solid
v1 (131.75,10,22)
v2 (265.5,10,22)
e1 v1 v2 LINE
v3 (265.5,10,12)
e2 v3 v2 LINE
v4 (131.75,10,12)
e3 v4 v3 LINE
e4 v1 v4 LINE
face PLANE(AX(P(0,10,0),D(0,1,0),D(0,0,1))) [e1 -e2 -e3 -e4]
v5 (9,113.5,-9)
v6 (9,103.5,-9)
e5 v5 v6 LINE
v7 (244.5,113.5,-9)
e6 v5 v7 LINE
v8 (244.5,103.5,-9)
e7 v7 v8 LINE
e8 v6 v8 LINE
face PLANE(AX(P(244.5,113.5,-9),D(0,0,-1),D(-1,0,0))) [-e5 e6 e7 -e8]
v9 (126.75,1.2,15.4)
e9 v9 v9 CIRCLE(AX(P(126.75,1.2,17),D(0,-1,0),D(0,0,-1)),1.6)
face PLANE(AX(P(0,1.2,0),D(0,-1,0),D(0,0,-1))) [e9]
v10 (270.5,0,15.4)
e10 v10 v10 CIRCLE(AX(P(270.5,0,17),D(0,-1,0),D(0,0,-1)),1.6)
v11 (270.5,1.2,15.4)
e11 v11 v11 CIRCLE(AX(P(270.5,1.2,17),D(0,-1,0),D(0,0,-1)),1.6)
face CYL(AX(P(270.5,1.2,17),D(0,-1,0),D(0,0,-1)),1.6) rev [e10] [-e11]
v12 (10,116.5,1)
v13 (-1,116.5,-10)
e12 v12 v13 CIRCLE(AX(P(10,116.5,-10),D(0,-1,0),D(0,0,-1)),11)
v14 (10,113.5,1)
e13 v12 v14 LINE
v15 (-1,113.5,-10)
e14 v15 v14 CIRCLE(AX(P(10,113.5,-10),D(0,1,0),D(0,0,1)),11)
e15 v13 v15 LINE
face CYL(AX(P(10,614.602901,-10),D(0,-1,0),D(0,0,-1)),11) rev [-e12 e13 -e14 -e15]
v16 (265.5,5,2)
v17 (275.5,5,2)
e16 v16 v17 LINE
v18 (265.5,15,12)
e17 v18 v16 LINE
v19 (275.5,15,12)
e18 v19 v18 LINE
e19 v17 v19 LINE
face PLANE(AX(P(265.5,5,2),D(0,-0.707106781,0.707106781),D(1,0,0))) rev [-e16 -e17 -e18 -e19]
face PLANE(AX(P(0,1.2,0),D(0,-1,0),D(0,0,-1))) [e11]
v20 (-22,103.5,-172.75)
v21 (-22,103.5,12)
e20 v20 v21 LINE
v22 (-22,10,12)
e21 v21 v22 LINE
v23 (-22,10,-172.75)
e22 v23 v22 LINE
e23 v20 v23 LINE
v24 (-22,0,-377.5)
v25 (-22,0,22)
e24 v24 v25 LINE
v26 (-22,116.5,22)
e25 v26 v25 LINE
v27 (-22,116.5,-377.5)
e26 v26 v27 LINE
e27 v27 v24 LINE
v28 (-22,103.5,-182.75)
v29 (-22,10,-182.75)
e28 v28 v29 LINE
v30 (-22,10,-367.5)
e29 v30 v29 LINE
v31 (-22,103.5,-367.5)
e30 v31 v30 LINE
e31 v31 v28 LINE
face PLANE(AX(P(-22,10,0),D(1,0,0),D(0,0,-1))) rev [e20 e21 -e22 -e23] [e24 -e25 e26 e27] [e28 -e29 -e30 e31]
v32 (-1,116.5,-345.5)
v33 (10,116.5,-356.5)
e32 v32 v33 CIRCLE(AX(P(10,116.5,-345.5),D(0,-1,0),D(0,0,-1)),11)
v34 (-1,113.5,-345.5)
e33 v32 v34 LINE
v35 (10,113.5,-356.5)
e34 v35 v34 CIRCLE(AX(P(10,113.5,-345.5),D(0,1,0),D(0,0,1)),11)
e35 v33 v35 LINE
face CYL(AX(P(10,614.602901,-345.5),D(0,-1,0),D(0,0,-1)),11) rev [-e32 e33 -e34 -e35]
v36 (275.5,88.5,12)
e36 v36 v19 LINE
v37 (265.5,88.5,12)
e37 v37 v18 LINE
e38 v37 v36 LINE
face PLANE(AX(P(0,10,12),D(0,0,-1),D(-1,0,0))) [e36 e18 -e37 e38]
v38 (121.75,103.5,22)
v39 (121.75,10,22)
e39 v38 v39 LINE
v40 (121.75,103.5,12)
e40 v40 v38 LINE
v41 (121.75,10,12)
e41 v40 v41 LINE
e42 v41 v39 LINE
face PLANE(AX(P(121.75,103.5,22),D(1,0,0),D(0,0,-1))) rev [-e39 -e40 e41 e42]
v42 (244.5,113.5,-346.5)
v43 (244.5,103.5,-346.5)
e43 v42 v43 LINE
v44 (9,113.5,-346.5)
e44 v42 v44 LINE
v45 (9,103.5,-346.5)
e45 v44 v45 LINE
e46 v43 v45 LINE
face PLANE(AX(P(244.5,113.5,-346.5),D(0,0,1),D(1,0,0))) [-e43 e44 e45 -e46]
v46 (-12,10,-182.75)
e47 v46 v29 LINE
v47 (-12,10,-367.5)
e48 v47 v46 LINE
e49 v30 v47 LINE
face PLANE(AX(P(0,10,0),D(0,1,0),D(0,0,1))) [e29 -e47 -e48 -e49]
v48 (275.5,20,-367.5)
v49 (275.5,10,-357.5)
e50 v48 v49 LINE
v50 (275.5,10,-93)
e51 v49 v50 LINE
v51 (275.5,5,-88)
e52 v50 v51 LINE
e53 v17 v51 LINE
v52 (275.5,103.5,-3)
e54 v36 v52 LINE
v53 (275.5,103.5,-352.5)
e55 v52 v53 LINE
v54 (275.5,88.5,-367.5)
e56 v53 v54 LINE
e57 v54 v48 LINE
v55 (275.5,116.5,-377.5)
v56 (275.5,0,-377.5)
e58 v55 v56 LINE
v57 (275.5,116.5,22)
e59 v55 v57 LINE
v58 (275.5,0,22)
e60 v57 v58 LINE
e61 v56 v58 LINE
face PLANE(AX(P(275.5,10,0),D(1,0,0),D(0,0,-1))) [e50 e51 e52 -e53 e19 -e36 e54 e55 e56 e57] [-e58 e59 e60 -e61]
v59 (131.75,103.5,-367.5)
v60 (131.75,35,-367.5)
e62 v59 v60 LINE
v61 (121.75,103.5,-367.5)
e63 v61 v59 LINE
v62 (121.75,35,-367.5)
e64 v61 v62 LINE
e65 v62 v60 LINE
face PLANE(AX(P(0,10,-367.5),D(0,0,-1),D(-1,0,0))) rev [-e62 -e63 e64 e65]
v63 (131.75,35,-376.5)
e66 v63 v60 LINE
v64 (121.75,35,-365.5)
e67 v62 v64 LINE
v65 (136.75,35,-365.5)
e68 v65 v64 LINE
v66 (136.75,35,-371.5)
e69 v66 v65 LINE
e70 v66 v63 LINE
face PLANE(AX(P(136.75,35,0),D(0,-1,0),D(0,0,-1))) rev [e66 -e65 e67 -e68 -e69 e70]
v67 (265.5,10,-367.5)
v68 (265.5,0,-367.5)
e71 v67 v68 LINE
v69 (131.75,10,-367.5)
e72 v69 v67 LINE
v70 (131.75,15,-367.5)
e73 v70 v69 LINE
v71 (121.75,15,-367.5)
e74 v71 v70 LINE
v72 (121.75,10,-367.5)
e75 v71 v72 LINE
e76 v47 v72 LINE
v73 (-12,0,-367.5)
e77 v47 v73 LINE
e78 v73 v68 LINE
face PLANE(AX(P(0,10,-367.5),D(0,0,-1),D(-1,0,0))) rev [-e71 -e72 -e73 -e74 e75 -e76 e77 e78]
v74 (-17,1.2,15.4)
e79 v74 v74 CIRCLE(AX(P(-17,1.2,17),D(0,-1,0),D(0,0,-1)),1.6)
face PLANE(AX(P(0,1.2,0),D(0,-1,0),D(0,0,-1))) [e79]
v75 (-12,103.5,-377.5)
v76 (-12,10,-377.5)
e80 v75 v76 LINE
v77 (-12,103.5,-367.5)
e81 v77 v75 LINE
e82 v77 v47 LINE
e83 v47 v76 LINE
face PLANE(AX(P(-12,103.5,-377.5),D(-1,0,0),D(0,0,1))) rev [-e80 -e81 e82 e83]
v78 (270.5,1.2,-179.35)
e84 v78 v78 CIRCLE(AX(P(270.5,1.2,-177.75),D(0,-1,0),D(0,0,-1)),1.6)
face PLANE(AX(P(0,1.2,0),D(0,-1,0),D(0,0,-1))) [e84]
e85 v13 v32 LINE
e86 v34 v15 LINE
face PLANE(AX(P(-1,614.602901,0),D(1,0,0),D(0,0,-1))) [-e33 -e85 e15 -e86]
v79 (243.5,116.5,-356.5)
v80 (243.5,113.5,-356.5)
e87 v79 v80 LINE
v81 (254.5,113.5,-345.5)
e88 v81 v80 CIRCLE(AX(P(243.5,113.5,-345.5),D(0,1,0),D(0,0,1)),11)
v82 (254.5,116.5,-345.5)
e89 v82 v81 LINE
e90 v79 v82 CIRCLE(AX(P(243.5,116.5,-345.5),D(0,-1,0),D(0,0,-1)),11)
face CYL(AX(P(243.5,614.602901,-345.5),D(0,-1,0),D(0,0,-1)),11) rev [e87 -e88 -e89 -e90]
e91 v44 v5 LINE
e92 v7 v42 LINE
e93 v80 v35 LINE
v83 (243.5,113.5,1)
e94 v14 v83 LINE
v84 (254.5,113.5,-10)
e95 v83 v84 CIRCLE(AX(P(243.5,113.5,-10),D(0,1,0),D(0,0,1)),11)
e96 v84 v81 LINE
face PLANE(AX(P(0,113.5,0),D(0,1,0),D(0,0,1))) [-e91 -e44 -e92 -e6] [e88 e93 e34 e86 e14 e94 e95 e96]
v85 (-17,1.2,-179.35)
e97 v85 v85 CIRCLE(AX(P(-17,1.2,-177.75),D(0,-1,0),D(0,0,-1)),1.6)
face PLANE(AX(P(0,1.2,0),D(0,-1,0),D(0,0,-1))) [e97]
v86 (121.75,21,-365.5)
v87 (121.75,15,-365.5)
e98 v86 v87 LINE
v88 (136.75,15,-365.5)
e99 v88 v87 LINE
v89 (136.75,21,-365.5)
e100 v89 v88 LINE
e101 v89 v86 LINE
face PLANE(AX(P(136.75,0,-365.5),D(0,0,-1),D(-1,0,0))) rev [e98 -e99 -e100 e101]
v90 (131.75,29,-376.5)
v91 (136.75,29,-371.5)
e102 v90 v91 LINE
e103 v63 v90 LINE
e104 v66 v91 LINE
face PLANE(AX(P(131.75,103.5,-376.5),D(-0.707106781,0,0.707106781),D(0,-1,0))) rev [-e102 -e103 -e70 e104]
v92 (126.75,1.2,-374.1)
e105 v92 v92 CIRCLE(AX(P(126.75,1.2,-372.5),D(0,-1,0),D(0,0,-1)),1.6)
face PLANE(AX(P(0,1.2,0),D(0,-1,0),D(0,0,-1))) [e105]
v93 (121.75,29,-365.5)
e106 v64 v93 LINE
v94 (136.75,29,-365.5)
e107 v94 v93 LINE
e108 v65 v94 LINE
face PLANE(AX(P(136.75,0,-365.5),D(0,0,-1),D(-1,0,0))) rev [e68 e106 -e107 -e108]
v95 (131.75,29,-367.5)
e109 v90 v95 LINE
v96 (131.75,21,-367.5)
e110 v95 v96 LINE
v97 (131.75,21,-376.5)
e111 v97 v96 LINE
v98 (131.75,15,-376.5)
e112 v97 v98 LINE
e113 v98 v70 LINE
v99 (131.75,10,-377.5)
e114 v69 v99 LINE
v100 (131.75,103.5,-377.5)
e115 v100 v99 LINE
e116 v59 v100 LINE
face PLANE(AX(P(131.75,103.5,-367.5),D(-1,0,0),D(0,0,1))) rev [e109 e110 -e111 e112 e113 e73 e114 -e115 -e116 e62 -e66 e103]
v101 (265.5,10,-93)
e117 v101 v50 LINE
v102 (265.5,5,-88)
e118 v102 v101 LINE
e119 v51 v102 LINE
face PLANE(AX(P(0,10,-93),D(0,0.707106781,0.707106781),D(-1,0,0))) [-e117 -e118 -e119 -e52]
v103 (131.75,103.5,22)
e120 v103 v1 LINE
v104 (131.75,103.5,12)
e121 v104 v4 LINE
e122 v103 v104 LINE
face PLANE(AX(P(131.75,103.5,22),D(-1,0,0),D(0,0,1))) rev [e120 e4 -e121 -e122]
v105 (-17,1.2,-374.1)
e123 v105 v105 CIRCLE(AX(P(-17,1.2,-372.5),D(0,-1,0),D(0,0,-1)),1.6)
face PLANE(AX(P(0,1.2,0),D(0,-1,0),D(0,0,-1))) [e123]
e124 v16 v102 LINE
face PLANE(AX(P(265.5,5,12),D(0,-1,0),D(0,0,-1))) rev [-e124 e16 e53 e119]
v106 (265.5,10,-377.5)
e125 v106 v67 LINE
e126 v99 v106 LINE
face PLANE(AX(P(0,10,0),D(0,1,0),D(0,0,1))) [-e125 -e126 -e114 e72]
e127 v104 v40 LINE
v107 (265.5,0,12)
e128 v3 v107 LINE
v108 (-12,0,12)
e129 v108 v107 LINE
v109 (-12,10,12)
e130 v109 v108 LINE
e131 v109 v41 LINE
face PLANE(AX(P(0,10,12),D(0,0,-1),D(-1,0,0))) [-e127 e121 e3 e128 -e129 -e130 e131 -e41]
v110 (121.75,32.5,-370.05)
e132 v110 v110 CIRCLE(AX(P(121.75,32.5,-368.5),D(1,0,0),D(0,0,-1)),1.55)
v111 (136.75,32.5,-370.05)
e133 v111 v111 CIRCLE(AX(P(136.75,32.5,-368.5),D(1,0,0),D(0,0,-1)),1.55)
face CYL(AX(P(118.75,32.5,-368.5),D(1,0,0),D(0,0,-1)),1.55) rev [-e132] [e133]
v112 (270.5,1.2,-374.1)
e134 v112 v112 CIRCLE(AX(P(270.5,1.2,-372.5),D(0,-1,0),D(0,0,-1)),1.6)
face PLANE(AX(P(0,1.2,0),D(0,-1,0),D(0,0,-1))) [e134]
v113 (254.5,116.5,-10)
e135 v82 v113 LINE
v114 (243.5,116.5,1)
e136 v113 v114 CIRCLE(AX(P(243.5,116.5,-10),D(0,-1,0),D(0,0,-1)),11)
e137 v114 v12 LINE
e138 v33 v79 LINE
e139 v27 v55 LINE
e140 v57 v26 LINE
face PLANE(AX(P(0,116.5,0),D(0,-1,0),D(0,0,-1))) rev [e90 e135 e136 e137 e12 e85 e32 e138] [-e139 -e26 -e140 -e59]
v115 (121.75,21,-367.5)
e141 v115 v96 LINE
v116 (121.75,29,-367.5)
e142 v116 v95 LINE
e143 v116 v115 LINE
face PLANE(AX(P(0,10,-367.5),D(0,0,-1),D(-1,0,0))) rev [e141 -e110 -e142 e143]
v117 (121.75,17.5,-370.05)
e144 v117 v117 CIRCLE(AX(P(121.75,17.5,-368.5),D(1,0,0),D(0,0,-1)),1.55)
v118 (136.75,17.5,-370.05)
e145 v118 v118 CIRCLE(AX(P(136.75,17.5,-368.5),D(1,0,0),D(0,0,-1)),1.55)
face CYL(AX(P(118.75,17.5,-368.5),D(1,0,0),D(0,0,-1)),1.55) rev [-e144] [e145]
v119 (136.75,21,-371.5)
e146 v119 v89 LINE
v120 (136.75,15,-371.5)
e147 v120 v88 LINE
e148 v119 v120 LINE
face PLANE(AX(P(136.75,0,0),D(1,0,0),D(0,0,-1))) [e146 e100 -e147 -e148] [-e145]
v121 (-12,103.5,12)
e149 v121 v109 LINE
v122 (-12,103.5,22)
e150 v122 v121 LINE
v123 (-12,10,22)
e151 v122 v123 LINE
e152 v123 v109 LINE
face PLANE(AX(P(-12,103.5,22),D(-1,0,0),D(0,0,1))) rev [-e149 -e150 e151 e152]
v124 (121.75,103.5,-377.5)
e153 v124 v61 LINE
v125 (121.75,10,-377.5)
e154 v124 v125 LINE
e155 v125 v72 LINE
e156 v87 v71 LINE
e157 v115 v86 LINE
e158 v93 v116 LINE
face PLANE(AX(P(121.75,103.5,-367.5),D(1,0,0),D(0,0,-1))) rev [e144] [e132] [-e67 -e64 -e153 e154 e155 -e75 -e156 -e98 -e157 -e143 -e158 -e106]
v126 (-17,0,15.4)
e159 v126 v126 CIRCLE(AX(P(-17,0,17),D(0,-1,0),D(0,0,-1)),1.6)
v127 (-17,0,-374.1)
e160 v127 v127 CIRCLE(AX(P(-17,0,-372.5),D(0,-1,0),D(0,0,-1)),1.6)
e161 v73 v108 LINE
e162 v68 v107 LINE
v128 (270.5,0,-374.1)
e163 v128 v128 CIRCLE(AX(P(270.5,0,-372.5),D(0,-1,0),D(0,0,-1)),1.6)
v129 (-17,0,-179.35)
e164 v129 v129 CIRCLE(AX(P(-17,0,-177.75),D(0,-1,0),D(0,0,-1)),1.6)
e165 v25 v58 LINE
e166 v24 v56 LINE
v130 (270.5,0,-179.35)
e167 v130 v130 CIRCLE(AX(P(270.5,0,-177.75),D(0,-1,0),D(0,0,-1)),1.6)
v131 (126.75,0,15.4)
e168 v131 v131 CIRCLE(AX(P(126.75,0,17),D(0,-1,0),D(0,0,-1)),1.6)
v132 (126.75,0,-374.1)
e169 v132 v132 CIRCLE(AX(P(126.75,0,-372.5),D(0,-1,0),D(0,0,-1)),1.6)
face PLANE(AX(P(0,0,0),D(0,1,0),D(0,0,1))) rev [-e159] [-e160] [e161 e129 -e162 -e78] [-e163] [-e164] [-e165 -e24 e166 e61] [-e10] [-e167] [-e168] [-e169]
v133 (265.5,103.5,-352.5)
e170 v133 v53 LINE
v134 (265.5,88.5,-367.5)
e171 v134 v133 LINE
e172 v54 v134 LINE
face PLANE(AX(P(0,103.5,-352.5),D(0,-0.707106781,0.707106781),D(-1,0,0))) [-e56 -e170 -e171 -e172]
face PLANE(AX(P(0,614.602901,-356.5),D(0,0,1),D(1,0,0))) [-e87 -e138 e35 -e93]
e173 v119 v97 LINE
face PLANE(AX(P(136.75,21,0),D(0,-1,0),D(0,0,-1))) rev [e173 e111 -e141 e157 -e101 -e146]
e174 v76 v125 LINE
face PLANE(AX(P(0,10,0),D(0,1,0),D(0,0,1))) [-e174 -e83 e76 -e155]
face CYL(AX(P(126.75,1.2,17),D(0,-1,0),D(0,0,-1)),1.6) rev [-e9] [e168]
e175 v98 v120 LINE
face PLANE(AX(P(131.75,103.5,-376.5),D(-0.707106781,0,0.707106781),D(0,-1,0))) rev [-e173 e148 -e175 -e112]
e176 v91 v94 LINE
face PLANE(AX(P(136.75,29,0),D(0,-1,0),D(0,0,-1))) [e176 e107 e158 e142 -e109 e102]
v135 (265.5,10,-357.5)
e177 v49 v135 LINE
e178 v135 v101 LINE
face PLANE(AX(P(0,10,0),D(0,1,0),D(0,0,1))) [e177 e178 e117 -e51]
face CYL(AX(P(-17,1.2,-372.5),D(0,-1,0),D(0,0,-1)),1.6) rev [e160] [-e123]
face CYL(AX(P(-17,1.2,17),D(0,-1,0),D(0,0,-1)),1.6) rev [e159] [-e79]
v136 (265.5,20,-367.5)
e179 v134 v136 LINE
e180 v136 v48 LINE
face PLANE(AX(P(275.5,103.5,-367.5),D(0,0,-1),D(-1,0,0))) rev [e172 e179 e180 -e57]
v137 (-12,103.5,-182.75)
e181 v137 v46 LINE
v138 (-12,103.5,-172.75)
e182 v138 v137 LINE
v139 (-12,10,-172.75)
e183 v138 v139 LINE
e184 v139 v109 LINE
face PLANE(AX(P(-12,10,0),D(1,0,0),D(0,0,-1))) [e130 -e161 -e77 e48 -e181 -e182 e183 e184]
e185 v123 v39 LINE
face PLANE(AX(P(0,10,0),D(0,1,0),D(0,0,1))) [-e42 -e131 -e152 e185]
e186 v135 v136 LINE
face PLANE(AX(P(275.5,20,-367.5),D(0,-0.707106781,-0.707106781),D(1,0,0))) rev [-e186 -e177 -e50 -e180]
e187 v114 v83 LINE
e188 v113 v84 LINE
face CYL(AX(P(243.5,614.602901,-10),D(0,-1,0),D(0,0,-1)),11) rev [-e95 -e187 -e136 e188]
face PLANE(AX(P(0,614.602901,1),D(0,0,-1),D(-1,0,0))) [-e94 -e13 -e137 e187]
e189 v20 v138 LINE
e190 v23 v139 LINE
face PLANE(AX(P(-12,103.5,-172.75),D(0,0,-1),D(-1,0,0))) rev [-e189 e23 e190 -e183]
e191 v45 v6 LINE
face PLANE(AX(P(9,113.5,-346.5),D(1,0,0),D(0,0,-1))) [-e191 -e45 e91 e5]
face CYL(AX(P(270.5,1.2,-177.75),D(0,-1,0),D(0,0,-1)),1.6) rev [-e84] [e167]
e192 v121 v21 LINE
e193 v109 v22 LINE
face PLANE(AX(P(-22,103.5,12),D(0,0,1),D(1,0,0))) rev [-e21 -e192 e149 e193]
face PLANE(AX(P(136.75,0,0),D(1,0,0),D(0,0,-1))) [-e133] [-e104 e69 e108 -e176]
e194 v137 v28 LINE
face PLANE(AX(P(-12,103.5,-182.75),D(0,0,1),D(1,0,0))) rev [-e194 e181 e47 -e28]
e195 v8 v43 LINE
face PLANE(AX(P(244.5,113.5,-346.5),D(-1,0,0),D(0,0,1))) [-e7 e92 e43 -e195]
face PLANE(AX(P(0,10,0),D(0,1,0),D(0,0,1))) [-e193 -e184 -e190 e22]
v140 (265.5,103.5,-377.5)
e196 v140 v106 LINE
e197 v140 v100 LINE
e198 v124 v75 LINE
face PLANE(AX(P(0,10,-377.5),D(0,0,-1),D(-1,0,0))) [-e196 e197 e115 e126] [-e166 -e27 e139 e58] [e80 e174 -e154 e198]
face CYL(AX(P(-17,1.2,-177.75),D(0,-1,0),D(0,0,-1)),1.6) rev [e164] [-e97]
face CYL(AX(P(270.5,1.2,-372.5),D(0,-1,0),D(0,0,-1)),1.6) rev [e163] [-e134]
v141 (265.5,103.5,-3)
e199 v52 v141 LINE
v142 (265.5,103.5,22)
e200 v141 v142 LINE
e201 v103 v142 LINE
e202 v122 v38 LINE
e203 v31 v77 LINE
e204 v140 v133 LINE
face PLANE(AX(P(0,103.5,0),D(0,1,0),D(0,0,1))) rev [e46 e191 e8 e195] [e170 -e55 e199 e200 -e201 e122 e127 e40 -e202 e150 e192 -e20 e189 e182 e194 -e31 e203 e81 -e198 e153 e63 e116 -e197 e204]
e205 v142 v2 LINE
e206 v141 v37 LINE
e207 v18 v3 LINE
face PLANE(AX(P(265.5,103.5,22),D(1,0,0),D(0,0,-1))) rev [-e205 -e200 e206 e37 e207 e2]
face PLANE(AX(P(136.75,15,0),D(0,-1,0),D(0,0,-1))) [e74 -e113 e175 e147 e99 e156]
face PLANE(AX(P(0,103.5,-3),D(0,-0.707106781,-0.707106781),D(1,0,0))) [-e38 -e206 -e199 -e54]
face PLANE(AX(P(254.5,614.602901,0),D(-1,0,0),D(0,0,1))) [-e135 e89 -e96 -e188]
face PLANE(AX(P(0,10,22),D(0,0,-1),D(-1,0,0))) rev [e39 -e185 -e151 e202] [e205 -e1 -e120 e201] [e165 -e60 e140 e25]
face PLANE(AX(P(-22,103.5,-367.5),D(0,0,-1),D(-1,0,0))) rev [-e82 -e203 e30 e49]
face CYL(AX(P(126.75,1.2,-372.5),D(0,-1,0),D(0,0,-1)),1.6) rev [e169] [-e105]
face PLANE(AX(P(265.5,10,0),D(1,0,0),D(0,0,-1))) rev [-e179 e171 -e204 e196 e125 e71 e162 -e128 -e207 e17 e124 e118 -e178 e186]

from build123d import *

# Parameters (mm, degrees)
SKETCH1_W           = 297.5
SKETCH1_H           = 399.5
SKETCH1_W_2         = 277.5
SKETCH1_H_2         = 379.5
BOSS_EXTRUDE1_DEPTH = 10
SKETCH2_W           = 10
SKETCH2_H           = 10
BOSS_EXTRUDE2_DEPTH = 93.5
SKETCH3_W           = 297.5
SKETCH3_H           = 399.5
SKETCH3_W_2         = 235.5
SKETCH3_H_2         = 337.5
BOSS_EXTRUDE3_DEPTH = 10
CUT_EXTRUDE1_DEPTH  = 1.2
SKETCH6_W           = 297.5
SKETCH6_H           = 399.5
BOSS_EXTRUDE4_DEPTH = 3
SKETCH7_W           = 14
SKETCH7_H           = 93.5
CUT_EXTRUDE2_DEPTH  = 16.15
CHAMFER1_SIZE       = 15
SKETCH8_W           = 4
SKETCH8_H           = 6
SKETCH8_W_2         = 2
BOSS_EXTRUDE5_DEPTH = 5
SKETCH10_W          = 2
SKETCH10_H          = 6
BOSS_EXTRUDE6_DEPTH = 10
CUT_EXTRUDE4_DEPTH  = 18
CHAMFER2_SIZE       = 5
SKETCH12_W          = 95
SKETCH12_H          = 5
CUT_EXTRUDE5_DEPTH  = 10
CHAMFER3_SIZE       = 10


# Some blends are built 0.0001 mm under size
with BuildPart() as part:
    # Sketch1 → Boss-Extrude1 (new body)
    with BuildSketch(Plane(origin=(0, 0, 0), x_dir=(1, 0, 0), z_dir=(0, 1, 0))):
        with Locations((126.75, 177.75)):
            Rectangle(SKETCH1_W, SKETCH1_H)
        with Locations((126.75, 177.75)):
            Rectangle(SKETCH1_W_2, SKETCH1_H_2, mode=Mode.SUBTRACT)
    extrude(amount=BOSS_EXTRUDE1_DEPTH)

    # Sketch2 → Boss-Extrude2 (add)
    with BuildSketch(Plane(origin=(0, 10, 0), x_dir=(1, 0, 0), z_dir=(0, 1, 0))):
        with Locations((126.75, -17)):
            Rectangle(SKETCH2_W, SKETCH2_H)
        with Locations((270.5, -17)):
            Rectangle(SKETCH2_W, SKETCH2_H)
        with Locations((-17, -17)):
            Rectangle(SKETCH2_W, SKETCH2_H)
        with Locations((-17, 372.5)):
            Rectangle(SKETCH2_W, SKETCH2_H)
        with Locations((270.5, 372.5)):
            Rectangle(SKETCH2_W, SKETCH2_H)
        with Locations((126.75, 372.5)):
            Rectangle(SKETCH2_W, SKETCH2_H)
        with Locations((270.5, 177.75)):
            Rectangle(SKETCH2_W, SKETCH2_H)
        with Locations((-17, 177.75)):
            Rectangle(SKETCH2_W, SKETCH2_H)
    extrude(amount=BOSS_EXTRUDE2_DEPTH)

    # Sketch3 → Boss-Extrude3 (add)
    with BuildSketch(Plane(origin=(0, 103.5, 0), x_dir=(1, 0, 0), z_dir=(0, 1, 0))):
        with Locations((126.75, 177.75)):
            Rectangle(SKETCH3_W, SKETCH3_H)
        with Locations((126.75, 177.75)):
            Rectangle(SKETCH3_W_2, SKETCH3_H_2, mode=Mode.SUBTRACT)
    extrude(amount=BOSS_EXTRUDE3_DEPTH)

    # Sketch4 → Cut-Extrude1 (cut)
    with BuildSketch(Plane.XZ):
        with BuildLine():
            ThreePointArc((268.9, 17), (269.021792748, 16.387706508), (269.36862915, 15.86862915))
            Line((269.36862915, 15.86862915), (270.5, 17))
            Line((270.5, 17), (268.9, 17))
        make_face()
        with BuildLine():
            Line((270.5, 17), (269.36862915, 15.86862915))
            ThreePointArc((269.36862915, 15.86862915), (271.112293492, 15.521792748), (272.1, 17))
            Line((272.1, 17), (270.5, 17))
        make_face()
        with BuildLine():
            Line((270.5, 17), (272.1, 17))
            ThreePointArc((272.1, 17), (271.978207252, 17.612293492), (271.63137085, 18.13137085))
            Line((271.63137085, 18.13137085), (270.5, 17))
        make_face()
        with BuildLine():
            ThreePointArc((271.63137085, 18.13137085), (269.887706508, 18.478207252), (268.9, 17))
            Line((268.9, 17), (270.5, 17))
            Line((270.5, 17), (271.63137085, 18.13137085))
        make_face()
        with BuildLine():
            ThreePointArc((268.9, -177.75), (270.5, -179.35), (272.1, -177.75))
            Line((272.1, -177.75), (268.9, -177.75))
        make_face()
        with BuildLine():
            Line((268.9, -177.75), (272.1, -177.75))
            ThreePointArc((272.1, -177.75), (270.5, -176.15), (268.9, -177.75))
        make_face()
        with BuildLine():
            ThreePointArc((272.1, -372.5), (271.112293492, -371.021792748), (269.36862915, -371.36862915))
            Line((269.36862915, -371.36862915), (270.5, -372.5))
            Line((270.5, -372.5), (272.1, -372.5))
        make_face()
        with BuildLine():
            Line((270.5, -372.5), (269.36862915, -371.36862915))
            ThreePointArc((269.36862915, -371.36862915), (269.021792748, -371.887706508), (268.9, -372.5))
            Line((268.9, -372.5), (270.5, -372.5))
        make_face()
        with BuildLine():
            ThreePointArc((271.63137085, -373.63137085), (271.978207252, -373.112293492), (272.1, -372.5))
            Line((272.1, -372.5), (270.5, -372.5))
            Line((270.5, -372.5), (271.63137085, -373.63137085))
        make_face()
        with BuildLine():
            Line((270.5, -372.5), (268.9, -372.5))
            ThreePointArc((268.9, -372.5), (269.887706508, -373.978207252), (271.63137085, -373.63137085))
            Line((271.63137085, -373.63137085), (270.5, -372.5))
        make_face()
        with BuildLine():
            ThreePointArc((125.15, 17), (125.61862915, 15.86862915), (126.75, 15.4))
            Line((126.75, 15.4), (126.75, 17))
            Line((126.75, 17), (125.15, 17))
        make_face()
        with BuildLine():
            Line((126.75, 17), (126.75, 15.4))
            ThreePointArc((126.75, 15.4), (127.88137085, 15.86862915), (128.35, 17))
            Line((128.35, 17), (126.75, 17))
        make_face()
        with BuildLine():
            Line((126.75, 17), (128.35, 17))
            ThreePointArc((128.35, 17), (127.88137085, 18.13137085), (126.75, 18.6))
            Line((126.75, 18.6), (126.75, 17))
        make_face()
        with BuildLine():
            Line((125.15, 17), (126.75, 17))
            Line((126.75, 17), (126.75, 18.6))
            ThreePointArc((126.75, 18.6), (125.61862915, 18.13137085), (125.15, 17))
        make_face()
        with BuildLine():
            ThreePointArc((128.35, -372.5), (127.88137085, -371.36862915), (126.75, -370.9))
            Line((126.75, -370.9), (126.75, -372.5))
            Line((126.75, -372.5), (128.35, -372.5))
        make_face()
        with BuildLine():
            Line((126.75, -372.5), (126.75, -370.9))
            ThreePointArc((126.75, -370.9), (125.61862915, -371.36862915), (125.15, -372.5))
            Line((125.15, -372.5), (126.75, -372.5))
        make_face()
        with BuildLine():
            ThreePointArc((126.75, -374.1), (127.88137085, -373.63137085), (128.35, -372.5))
            Line((128.35, -372.5), (126.75, -372.5))
            Line((126.75, -372.5), (126.75, -374.1))
        make_face()
        with BuildLine():
            Line((126.75, -374.1), (126.75, -372.5))
            Line((126.75, -372.5), (125.15, -372.5))
            ThreePointArc((125.15, -372.5), (125.61862915, -373.63137085), (126.75, -374.1))
        make_face()
        with BuildLine():
            ThreePointArc((-18.6, 17), (-18.13137085, 15.86862915), (-17, 15.4))
            Line((-17, 15.4), (-17, 17))
            Line((-17, 17), (-18.6, 17))
        make_face()
        with BuildLine():
            Line((-17, 17), (-15.4, 17))
            ThreePointArc((-15.4, 17), (-15.86862915, 18.13137085), (-17, 18.6))
            Line((-17, 18.6), (-17, 17))
        make_face()
        with BuildLine():
            ThreePointArc((-17, 15.4), (-16.387706508, 15.521792748), (-15.86862915, 15.86862915))
            Line((-15.86862915, 15.86862915), (-17, 17))
            Line((-17, 17), (-17, 15.4))
        make_face()
        with BuildLine():
            Line((-18.13137085, 18.13137085), (-17, 17))
            Line((-17, 17), (-17, 18.6))
            ThreePointArc((-17, 18.6), (-17.612293492, 18.478207252), (-18.13137085, 18.13137085))
        make_face()
        with BuildLine():
            Line((-17, 17), (-15.86862915, 15.86862915))
            ThreePointArc((-15.86862915, 15.86862915), (-15.521792748, 16.387706508), (-15.4, 17))
            Line((-15.4, 17), (-17, 17))
        make_face()
        with BuildLine():
            Line((-18.6, 17), (-17, 17))
            Line((-17, 17), (-18.13137085, 18.13137085))
            ThreePointArc((-18.13137085, 18.13137085), (-18.478207252, 17.612293492), (-18.6, 17))
        make_face()
        with BuildLine():
            ThreePointArc((-17, -179.35), (-15.86862915, -178.88137085), (-15.4, -177.75))
            Line((-15.4, -177.75), (-17, -177.75))
            Line((-17, -177.75), (-17, -179.35))
        make_face()
        with BuildLine():
            Line((-17, -177.75), (-15.4, -177.75))
            ThreePointArc((-15.4, -177.75), (-15.86862915, -176.61862915), (-17, -176.15))
            Line((-17, -176.15), (-17, -177.75))
        make_face()
        with BuildLine():
            Line((-17, -179.35), (-17, -177.75))
            Line((-17, -177.75), (-18.6, -177.75))
            ThreePointArc((-18.6, -177.75), (-18.13137085, -178.88137085), (-17, -179.35))
        make_face()
        with BuildLine():
            Line((-18.6, -177.75), (-17, -177.75))
            Line((-17, -177.75), (-17, -176.15))
            ThreePointArc((-17, -176.15), (-18.13137085, -176.61862915), (-18.6, -177.75))
        make_face()
        with BuildLine():
            ThreePointArc((-15.4, -372.5), (-15.521792748, -371.887706508), (-15.86862915, -371.36862915))
            Line((-15.86862915, -371.36862915), (-17, -372.5))
            Line((-17, -372.5), (-15.4, -372.5))
        make_face()
        with BuildLine():
            Line((-18.13137085, -373.63137085), (-17, -372.5))
            Line((-17, -372.5), (-18.6, -372.5))
            ThreePointArc((-18.6, -372.5), (-18.478207252, -373.112293492), (-18.13137085, -373.63137085))
        make_face()
        with BuildLine():
            Line((-17, -372.5), (-15.86862915, -371.36862915))
            ThreePointArc((-15.86862915, -371.36862915), (-16.387706508, -371.021792748), (-17, -370.9))
            Line((-17, -370.9), (-17, -372.5))
        make_face()
        with BuildLine():
            Line((-17, -374.1), (-17, -372.5))
            Line((-17, -372.5), (-18.13137085, -373.63137085))
            ThreePointArc((-18.13137085, -373.63137085), (-17.612293492, -373.978207252), (-17, -374.1))
        make_face()
        with BuildLine():
            Line((-17, -372.5), (-17, -370.9))
            ThreePointArc((-17, -370.9), (-18.13137085, -371.36862915), (-18.6, -372.5))
            Line((-18.6, -372.5), (-17, -372.5))
        make_face()
        with BuildLine():
            ThreePointArc((-17, -374.1), (-15.86862915, -373.63137085), (-15.4, -372.5))
            Line((-15.4, -372.5), (-17, -372.5))
            Line((-17, -372.5), (-17, -374.1))
        make_face()
    extrude(amount=-CUT_EXTRUDE1_DEPTH, mode=Mode.SUBTRACT)

    # Sketch6 → Boss-Extrude4 (add)
    with BuildSketch(Plane(origin=(0, 113.5, 0), x_dir=(1, 0, 0), z_dir=(0, 1, 0))):
        with Locations((126.75, 177.75)):
            Rectangle(SKETCH6_W, SKETCH6_H)
        with BuildLine():
            ThreePointArc((243.5, -1), (251.278174593, 2.221825407), (254.5, 10))
            Line((254.5, 10), (254.5, 345.5))
            ThreePointArc((254.5, 345.5), (251.278174593, 353.278174593), (243.5, 356.5))
            Line((243.5, 356.5), (10, 356.5))
            ThreePointArc((10, 356.5), (2.221825407, 353.278174593), (-1, 345.5))
            Line((-1, 345.5), (-1, 10))
            ThreePointArc((-1, 10), (2.221825407, 2.221825407), (10, -1))
            Line((10, -1), (243.5, -1))
        make_face(mode=Mode.SUBTRACT)
    extrude(amount=BOSS_EXTRUDE4_DEPTH)

    # Sketch7 → Cut-Extrude2 (cut)
    with BuildSketch(Plane(origin=(275.5, 0, 0), x_dir=(0, 0, -1), z_dir=(1, 0, 0))):
        with Locations((177.75, 56.75)):
            Rectangle(SKETCH7_W, SKETCH7_H)
    extrude(amount=-CUT_EXTRUDE2_DEPTH, mode=Mode.SUBTRACT)

    # Chamfer1
    chamfer1_edges = [part.edges().sort_by_distance(p)[0] for p in [
        (270.5, 103.5, 12),
        (270.5, 103.5, -367.5),
    ]]
    chamfer(chamfer1_edges, length=CHAMFER1_SIZE)

    # Sketch8 → Boss-Extrude5 (add)
    with BuildSketch(Plane(origin=(131.75, 0, 0), x_dir=(0, 0, -1), z_dir=(1, 0, 0))):
        with Locations((369.5, 32)):
            Rectangle(SKETCH8_W, SKETCH8_H)
        with Locations((366.5, 32)):
            Rectangle(SKETCH8_W_2, SKETCH8_H)
        with Locations((369.5, 18)):
            Rectangle(SKETCH8_W, SKETCH8_H)
        with Locations((366.5, 18)):
            Rectangle(SKETCH8_W_2, SKETCH8_H)
    extrude(amount=BOSS_EXTRUDE5_DEPTH)

    # Sketch10 → Boss-Extrude6 (add)
    with BuildSketch(Plane.ZY.offset(-131.75)):
        with Locations((-366.5, 18)):
            Rectangle(SKETCH10_W, SKETCH10_H)
        with Locations((-366.5, 32)):
            Rectangle(SKETCH10_W, SKETCH10_H)
    extrude(amount=BOSS_EXTRUDE6_DEPTH)

    # Sketch11 → Cut-Extrude4 (cut)
    with BuildSketch(Plane(origin=(136.75, 0, 0), x_dir=(0, 0, -1), z_dir=(1, 0, 0))):
        with BuildLine():
            ThreePointArc((370.05, 17.5), (368.5, 19.05), (366.95, 17.5))
            ThreePointArc((366.95, 17.5), (368.5, 15.95), (370.05, 17.5))
        make_face()
        with BuildLine():
            ThreePointArc((370.05, 32.5), (368.5, 34.05), (366.95, 32.5))
            ThreePointArc((366.95, 32.5), (368.5, 30.95), (370.05, 32.5))
        make_face()
    extrude(amount=-CUT_EXTRUDE4_DEPTH, mode=Mode.SUBTRACT)

    # Chamfer2
    chamfer2_edges = [part.edges().sort_by_distance(p)[0] for p in [
        (131.75, 18, -371.5),
        (131.75, 32, -371.5),
    ]]
    chamfer(chamfer2_edges, length=CHAMFER2_SIZE - 0.0001)  # a hair under: the kernel refuses the full size

    # Sketch12 → Cut-Extrude5 (cut)
    with BuildSketch(Plane(origin=(275.5, 0, 0), x_dir=(0, 0, -1), z_dir=(1, 0, 0))):
        with Locations((35.5, 7.5)):
            Rectangle(SKETCH12_W, SKETCH12_H)
    extrude(amount=-CUT_EXTRUDE5_DEPTH, mode=Mode.SUBTRACT)

    # Chamfer3
    # the kernel refuses this chamfer: 10 mm, written as the material it adds along each edge
    with BuildSketch(Plane(origin=(265.5, 10, -367.5), x_dir=(0, -0.027495876610586282, 0.9996219169112968), z_dir=(1, 0, 0)), Plane(origin=(275.5, 5, 12), x_dir=(0, -0.02749587661058641, -0.9996219169112968), z_dir=(-1, 0, 0))) as chamfer3_piece_1:
        Polygon((CHAMFER3_SIZE * 0.999621916911, -CHAMFER3_SIZE * 0.0274958766106), (-CHAMFER3_SIZE * 0.0274958766106, -CHAMFER3_SIZE * 0.999621916911), (0, 0), align=None)
    extrude(amount=10)
    # the kernel refuses this chamfer: 10 mm, written as the material it takes off along each edge
    with BuildSketch(Plane(origin=(301.21682988, 10, -83), x_dir=(0, -0.9996219169112968, 0.027495876610586317), z_dir=(-1, 0, 0))) as chamfer3_2_piece_1_section:
        Polygon((CHAMFER3_SIZE * 0.999621916911, -CHAMFER3_SIZE * 0.0274958766106), (-CHAMFER3_SIZE * 0.0274958766106, -CHAMFER3_SIZE * 0.999621916911), (0, 0), align=None)
    chamfer3_2_piece_1 = extrude(amount=61.433659759, mode=Mode.PRIVATE)
    chamfer3_2_piece_1 = split(chamfer3_2_piece_1, bisect_by=Plane(origin=(270.5, 5, -86.934010841), z_dir=(0, 1, 0)), keep=Keep.TOP, mode=Mode.PRIVATE)
    add(chamfer3_2_piece_1, mode=Mode.SUBTRACT)


solid = part.part
